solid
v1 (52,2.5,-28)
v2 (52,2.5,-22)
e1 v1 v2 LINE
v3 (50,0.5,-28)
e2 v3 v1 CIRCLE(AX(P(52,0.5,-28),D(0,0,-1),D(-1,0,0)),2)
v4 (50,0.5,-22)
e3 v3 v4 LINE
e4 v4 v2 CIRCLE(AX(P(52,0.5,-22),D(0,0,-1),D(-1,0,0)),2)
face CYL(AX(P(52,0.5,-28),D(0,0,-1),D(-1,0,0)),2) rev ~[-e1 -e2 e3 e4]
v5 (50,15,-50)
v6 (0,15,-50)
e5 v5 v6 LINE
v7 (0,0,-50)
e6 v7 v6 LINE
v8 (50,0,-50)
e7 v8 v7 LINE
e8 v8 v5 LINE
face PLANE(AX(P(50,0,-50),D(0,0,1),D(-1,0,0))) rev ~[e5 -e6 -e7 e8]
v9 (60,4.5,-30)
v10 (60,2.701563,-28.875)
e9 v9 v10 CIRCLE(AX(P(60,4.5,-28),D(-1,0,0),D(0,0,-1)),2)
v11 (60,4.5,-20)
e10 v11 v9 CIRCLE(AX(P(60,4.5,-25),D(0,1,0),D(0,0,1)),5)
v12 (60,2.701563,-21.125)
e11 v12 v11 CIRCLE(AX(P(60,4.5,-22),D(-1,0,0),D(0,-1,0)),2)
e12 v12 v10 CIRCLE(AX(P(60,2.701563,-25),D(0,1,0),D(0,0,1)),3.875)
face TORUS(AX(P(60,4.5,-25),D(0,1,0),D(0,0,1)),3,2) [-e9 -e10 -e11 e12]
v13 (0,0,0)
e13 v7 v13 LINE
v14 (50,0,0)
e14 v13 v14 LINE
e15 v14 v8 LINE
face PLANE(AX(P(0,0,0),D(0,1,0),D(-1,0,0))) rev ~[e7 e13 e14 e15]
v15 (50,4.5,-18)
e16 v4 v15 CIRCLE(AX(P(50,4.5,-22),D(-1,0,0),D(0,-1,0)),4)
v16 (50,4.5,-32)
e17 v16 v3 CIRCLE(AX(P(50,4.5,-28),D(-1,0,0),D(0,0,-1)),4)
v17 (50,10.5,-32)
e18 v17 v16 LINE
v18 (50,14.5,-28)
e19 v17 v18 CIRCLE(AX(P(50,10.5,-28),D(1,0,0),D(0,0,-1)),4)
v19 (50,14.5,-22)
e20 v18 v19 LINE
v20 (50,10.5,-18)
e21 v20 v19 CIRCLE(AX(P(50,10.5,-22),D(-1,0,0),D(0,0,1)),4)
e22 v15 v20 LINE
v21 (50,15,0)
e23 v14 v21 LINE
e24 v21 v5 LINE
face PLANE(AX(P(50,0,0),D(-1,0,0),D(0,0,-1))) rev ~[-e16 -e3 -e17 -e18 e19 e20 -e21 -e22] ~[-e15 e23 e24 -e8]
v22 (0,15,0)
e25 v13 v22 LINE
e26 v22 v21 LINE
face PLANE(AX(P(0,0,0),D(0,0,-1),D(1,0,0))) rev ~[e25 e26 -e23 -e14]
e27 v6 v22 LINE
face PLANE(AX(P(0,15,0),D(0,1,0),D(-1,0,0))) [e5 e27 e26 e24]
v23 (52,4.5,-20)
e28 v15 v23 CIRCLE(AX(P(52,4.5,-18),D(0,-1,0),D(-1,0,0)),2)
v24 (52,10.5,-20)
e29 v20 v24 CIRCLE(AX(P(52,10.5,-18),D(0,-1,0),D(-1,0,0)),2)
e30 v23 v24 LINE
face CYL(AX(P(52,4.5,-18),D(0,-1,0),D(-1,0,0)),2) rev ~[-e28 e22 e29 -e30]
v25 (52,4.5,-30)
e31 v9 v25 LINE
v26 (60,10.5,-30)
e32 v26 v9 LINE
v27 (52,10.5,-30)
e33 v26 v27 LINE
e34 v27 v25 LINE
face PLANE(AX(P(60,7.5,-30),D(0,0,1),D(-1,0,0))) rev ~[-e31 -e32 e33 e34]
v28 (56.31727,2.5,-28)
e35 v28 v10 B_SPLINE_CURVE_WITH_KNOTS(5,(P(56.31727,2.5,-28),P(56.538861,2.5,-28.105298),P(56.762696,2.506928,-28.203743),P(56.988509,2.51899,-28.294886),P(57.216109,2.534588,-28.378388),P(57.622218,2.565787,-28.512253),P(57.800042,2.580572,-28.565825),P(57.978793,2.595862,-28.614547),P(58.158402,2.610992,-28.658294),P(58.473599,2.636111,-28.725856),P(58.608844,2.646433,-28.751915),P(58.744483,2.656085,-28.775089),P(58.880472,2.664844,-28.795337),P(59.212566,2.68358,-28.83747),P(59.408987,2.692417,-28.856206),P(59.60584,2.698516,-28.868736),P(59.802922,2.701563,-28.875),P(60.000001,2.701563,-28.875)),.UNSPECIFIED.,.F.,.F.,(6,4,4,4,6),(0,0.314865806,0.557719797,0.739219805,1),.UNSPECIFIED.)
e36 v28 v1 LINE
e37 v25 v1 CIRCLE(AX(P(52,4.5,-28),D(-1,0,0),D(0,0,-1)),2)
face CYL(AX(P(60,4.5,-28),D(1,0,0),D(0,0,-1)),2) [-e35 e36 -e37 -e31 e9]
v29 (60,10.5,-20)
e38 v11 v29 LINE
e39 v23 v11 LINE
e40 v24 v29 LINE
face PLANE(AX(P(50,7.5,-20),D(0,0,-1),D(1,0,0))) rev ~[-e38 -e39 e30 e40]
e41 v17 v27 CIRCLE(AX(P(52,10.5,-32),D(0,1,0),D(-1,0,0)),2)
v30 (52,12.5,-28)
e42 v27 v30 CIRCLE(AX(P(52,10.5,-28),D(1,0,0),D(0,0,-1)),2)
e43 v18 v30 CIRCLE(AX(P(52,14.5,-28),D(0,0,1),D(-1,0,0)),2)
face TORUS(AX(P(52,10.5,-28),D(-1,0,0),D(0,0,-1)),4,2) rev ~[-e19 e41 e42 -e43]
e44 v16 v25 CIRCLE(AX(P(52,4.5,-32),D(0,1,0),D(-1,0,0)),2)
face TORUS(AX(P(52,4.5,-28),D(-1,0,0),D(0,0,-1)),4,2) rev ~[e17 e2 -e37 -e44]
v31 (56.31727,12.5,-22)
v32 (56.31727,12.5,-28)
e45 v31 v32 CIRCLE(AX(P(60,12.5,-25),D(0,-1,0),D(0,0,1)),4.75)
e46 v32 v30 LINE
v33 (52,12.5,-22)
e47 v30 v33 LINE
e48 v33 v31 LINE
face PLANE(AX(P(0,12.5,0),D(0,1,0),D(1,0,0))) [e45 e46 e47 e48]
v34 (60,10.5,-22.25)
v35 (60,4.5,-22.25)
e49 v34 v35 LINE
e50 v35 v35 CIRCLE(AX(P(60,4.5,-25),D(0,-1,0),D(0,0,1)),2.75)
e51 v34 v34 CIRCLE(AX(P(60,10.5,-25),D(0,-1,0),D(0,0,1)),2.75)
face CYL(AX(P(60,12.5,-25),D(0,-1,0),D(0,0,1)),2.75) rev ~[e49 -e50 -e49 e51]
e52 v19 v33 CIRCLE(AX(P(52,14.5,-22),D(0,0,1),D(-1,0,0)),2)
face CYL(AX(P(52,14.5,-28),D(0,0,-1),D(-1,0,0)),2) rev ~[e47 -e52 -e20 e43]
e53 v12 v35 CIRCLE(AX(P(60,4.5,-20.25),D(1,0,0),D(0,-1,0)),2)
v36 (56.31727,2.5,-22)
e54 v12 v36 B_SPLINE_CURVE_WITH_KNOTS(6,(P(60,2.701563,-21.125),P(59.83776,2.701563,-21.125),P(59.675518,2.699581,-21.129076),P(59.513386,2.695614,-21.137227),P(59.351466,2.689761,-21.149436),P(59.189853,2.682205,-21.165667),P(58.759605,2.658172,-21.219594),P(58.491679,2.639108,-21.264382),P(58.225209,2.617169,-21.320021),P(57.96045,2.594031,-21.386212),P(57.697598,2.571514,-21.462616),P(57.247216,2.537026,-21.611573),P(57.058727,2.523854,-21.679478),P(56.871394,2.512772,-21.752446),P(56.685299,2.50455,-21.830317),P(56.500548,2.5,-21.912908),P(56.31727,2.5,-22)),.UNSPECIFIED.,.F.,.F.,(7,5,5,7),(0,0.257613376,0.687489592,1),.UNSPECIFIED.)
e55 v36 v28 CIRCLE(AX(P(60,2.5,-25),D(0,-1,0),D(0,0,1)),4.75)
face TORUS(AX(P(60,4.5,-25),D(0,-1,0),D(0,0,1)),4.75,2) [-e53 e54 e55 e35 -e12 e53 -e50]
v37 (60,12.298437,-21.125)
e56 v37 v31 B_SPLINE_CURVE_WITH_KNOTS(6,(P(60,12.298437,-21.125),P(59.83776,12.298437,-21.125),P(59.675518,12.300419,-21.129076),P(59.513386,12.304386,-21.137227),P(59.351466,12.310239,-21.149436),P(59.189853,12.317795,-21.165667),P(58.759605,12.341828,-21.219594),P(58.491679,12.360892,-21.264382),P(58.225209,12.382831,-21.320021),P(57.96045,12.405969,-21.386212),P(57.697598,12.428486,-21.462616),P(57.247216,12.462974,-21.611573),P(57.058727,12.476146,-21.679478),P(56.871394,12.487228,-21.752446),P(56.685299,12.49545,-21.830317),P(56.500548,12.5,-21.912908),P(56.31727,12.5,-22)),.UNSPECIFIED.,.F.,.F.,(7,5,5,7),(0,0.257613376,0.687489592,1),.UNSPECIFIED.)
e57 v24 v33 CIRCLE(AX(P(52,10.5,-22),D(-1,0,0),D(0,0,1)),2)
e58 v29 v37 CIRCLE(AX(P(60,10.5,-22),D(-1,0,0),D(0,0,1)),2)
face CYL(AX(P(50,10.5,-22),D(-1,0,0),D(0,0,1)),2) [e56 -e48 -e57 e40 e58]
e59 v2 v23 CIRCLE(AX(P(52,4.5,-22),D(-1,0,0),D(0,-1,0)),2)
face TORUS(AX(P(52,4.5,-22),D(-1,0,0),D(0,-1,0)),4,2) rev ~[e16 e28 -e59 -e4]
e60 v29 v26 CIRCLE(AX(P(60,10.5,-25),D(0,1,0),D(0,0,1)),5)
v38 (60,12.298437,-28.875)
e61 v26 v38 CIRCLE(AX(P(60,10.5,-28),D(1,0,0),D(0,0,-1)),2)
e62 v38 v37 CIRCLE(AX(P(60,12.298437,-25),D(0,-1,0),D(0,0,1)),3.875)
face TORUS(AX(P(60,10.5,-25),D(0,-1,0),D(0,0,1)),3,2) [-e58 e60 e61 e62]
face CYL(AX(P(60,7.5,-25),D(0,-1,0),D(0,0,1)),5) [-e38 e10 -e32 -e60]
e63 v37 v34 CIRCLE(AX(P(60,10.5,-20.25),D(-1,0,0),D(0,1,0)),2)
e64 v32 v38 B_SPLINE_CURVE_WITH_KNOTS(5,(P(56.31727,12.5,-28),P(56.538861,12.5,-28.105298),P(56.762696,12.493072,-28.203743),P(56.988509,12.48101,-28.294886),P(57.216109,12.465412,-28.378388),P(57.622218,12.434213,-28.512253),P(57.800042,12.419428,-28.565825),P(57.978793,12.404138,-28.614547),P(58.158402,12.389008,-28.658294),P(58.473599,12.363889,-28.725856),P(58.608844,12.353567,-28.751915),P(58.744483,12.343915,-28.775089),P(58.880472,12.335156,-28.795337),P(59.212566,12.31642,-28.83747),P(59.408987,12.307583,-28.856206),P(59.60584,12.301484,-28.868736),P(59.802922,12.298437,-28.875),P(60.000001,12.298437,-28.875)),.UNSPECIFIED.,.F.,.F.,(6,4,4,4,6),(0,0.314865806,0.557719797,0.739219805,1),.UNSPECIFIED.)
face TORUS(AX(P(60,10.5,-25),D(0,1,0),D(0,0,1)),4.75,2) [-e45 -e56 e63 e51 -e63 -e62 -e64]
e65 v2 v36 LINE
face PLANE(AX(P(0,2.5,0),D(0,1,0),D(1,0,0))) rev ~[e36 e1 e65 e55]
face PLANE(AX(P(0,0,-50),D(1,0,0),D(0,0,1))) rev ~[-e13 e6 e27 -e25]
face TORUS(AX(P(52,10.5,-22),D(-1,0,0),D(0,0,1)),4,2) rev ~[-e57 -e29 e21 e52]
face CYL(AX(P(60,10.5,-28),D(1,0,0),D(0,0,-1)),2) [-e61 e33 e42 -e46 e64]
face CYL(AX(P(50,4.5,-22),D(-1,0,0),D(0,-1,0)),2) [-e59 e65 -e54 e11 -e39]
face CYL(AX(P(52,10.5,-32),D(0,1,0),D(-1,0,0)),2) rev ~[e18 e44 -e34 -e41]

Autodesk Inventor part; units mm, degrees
ref_plane "YZ Plane" through (0, 0, 0) normal (1, 0, 0) x (0, 1, 0)
ref_plane "XZ Plane" through (0, 0, 0) normal (0, 1, 0) x (-1, 0, 0)
ref_plane "XY Plane" through (0, 0, 0) normal (0, 0, 1) x (1, 0, 0)
sketch "Sketch1" plane through (0, 0, 0) normal (0, 1, 0) x (-1, 0, 0)
  line L0 (0, 0) -> (-50, 0)
  line L1 (-50, 0) -> (-50, -50)
  line L2 (-50, -50) -> (0, -50)
  line L3 (0, -50) -> (0, 0)
  dimension "d0" = 50
  dimension "d1" = 50
extrude "Extrusion1" add sketch "Sketch1" along normal blind 15
ref_plane "Work Plane1" through (0, 7.5, 0) normal (0, 1, 0) x (1, 0, 0)
sketch "Sketch2" plane through (0, 7.5, 0) normal (0, 1, 0) x (1, 0, 0)
  line L0 (50, 20) -> (60, 20)
  line L1 (60, 20) -> (60, 30) construction
  line L2 (60, 30) -> (50, 30)
  line L3 (50, 30) -> (50, 20)
  line L4 (50, 20) -> (60, 30) construction
  line L5 (60, 20) -> (50, 30) construction
  line L6 (50, 0) -> (50, 50) projected
  arc A0 (60, 20) -> (60, 30) centre (60, 25) ccw
  line L7 (50, 25) -> (60, 25) construction
  point P0 (0, 0)
  dimension "d4" = 10
  dimension "d5" = 10
extrude "Extrusion2" add sketch "Sketch2" along normal mid plane 10
sketch "Sketch3" plane through (0, 12.5, 0) normal (0, 1, 0) x (1, 0, 0)
  arc A0 (60, 20) -> (60, 30) centre (60, 25) ccw projected
  point P0 (0, 0)
hole "Hole1" at (60, 12.5, -25) direction (0, -1, 0) diameter 5.5 end through all clearance for "Countersunk Flat Head Screw ISO 2009/7046" size "M5" standard "ISO"
fillet "Fillet1" radius 2 12 edges at (55, 2.5, -20) (55, 2.5, -30) (65, 2.5, -25) (55, 12.5, -30) (55, 12.5, -20) (65, 12.5, -25) (60, 12.5, -27.75) (60, 2.5, -27.75) (50, 12.5, -25) (50, 7.5, -20) (50, 2.5, -25) (50, 7.5, -30)
properties part number "Casing_Part3"
